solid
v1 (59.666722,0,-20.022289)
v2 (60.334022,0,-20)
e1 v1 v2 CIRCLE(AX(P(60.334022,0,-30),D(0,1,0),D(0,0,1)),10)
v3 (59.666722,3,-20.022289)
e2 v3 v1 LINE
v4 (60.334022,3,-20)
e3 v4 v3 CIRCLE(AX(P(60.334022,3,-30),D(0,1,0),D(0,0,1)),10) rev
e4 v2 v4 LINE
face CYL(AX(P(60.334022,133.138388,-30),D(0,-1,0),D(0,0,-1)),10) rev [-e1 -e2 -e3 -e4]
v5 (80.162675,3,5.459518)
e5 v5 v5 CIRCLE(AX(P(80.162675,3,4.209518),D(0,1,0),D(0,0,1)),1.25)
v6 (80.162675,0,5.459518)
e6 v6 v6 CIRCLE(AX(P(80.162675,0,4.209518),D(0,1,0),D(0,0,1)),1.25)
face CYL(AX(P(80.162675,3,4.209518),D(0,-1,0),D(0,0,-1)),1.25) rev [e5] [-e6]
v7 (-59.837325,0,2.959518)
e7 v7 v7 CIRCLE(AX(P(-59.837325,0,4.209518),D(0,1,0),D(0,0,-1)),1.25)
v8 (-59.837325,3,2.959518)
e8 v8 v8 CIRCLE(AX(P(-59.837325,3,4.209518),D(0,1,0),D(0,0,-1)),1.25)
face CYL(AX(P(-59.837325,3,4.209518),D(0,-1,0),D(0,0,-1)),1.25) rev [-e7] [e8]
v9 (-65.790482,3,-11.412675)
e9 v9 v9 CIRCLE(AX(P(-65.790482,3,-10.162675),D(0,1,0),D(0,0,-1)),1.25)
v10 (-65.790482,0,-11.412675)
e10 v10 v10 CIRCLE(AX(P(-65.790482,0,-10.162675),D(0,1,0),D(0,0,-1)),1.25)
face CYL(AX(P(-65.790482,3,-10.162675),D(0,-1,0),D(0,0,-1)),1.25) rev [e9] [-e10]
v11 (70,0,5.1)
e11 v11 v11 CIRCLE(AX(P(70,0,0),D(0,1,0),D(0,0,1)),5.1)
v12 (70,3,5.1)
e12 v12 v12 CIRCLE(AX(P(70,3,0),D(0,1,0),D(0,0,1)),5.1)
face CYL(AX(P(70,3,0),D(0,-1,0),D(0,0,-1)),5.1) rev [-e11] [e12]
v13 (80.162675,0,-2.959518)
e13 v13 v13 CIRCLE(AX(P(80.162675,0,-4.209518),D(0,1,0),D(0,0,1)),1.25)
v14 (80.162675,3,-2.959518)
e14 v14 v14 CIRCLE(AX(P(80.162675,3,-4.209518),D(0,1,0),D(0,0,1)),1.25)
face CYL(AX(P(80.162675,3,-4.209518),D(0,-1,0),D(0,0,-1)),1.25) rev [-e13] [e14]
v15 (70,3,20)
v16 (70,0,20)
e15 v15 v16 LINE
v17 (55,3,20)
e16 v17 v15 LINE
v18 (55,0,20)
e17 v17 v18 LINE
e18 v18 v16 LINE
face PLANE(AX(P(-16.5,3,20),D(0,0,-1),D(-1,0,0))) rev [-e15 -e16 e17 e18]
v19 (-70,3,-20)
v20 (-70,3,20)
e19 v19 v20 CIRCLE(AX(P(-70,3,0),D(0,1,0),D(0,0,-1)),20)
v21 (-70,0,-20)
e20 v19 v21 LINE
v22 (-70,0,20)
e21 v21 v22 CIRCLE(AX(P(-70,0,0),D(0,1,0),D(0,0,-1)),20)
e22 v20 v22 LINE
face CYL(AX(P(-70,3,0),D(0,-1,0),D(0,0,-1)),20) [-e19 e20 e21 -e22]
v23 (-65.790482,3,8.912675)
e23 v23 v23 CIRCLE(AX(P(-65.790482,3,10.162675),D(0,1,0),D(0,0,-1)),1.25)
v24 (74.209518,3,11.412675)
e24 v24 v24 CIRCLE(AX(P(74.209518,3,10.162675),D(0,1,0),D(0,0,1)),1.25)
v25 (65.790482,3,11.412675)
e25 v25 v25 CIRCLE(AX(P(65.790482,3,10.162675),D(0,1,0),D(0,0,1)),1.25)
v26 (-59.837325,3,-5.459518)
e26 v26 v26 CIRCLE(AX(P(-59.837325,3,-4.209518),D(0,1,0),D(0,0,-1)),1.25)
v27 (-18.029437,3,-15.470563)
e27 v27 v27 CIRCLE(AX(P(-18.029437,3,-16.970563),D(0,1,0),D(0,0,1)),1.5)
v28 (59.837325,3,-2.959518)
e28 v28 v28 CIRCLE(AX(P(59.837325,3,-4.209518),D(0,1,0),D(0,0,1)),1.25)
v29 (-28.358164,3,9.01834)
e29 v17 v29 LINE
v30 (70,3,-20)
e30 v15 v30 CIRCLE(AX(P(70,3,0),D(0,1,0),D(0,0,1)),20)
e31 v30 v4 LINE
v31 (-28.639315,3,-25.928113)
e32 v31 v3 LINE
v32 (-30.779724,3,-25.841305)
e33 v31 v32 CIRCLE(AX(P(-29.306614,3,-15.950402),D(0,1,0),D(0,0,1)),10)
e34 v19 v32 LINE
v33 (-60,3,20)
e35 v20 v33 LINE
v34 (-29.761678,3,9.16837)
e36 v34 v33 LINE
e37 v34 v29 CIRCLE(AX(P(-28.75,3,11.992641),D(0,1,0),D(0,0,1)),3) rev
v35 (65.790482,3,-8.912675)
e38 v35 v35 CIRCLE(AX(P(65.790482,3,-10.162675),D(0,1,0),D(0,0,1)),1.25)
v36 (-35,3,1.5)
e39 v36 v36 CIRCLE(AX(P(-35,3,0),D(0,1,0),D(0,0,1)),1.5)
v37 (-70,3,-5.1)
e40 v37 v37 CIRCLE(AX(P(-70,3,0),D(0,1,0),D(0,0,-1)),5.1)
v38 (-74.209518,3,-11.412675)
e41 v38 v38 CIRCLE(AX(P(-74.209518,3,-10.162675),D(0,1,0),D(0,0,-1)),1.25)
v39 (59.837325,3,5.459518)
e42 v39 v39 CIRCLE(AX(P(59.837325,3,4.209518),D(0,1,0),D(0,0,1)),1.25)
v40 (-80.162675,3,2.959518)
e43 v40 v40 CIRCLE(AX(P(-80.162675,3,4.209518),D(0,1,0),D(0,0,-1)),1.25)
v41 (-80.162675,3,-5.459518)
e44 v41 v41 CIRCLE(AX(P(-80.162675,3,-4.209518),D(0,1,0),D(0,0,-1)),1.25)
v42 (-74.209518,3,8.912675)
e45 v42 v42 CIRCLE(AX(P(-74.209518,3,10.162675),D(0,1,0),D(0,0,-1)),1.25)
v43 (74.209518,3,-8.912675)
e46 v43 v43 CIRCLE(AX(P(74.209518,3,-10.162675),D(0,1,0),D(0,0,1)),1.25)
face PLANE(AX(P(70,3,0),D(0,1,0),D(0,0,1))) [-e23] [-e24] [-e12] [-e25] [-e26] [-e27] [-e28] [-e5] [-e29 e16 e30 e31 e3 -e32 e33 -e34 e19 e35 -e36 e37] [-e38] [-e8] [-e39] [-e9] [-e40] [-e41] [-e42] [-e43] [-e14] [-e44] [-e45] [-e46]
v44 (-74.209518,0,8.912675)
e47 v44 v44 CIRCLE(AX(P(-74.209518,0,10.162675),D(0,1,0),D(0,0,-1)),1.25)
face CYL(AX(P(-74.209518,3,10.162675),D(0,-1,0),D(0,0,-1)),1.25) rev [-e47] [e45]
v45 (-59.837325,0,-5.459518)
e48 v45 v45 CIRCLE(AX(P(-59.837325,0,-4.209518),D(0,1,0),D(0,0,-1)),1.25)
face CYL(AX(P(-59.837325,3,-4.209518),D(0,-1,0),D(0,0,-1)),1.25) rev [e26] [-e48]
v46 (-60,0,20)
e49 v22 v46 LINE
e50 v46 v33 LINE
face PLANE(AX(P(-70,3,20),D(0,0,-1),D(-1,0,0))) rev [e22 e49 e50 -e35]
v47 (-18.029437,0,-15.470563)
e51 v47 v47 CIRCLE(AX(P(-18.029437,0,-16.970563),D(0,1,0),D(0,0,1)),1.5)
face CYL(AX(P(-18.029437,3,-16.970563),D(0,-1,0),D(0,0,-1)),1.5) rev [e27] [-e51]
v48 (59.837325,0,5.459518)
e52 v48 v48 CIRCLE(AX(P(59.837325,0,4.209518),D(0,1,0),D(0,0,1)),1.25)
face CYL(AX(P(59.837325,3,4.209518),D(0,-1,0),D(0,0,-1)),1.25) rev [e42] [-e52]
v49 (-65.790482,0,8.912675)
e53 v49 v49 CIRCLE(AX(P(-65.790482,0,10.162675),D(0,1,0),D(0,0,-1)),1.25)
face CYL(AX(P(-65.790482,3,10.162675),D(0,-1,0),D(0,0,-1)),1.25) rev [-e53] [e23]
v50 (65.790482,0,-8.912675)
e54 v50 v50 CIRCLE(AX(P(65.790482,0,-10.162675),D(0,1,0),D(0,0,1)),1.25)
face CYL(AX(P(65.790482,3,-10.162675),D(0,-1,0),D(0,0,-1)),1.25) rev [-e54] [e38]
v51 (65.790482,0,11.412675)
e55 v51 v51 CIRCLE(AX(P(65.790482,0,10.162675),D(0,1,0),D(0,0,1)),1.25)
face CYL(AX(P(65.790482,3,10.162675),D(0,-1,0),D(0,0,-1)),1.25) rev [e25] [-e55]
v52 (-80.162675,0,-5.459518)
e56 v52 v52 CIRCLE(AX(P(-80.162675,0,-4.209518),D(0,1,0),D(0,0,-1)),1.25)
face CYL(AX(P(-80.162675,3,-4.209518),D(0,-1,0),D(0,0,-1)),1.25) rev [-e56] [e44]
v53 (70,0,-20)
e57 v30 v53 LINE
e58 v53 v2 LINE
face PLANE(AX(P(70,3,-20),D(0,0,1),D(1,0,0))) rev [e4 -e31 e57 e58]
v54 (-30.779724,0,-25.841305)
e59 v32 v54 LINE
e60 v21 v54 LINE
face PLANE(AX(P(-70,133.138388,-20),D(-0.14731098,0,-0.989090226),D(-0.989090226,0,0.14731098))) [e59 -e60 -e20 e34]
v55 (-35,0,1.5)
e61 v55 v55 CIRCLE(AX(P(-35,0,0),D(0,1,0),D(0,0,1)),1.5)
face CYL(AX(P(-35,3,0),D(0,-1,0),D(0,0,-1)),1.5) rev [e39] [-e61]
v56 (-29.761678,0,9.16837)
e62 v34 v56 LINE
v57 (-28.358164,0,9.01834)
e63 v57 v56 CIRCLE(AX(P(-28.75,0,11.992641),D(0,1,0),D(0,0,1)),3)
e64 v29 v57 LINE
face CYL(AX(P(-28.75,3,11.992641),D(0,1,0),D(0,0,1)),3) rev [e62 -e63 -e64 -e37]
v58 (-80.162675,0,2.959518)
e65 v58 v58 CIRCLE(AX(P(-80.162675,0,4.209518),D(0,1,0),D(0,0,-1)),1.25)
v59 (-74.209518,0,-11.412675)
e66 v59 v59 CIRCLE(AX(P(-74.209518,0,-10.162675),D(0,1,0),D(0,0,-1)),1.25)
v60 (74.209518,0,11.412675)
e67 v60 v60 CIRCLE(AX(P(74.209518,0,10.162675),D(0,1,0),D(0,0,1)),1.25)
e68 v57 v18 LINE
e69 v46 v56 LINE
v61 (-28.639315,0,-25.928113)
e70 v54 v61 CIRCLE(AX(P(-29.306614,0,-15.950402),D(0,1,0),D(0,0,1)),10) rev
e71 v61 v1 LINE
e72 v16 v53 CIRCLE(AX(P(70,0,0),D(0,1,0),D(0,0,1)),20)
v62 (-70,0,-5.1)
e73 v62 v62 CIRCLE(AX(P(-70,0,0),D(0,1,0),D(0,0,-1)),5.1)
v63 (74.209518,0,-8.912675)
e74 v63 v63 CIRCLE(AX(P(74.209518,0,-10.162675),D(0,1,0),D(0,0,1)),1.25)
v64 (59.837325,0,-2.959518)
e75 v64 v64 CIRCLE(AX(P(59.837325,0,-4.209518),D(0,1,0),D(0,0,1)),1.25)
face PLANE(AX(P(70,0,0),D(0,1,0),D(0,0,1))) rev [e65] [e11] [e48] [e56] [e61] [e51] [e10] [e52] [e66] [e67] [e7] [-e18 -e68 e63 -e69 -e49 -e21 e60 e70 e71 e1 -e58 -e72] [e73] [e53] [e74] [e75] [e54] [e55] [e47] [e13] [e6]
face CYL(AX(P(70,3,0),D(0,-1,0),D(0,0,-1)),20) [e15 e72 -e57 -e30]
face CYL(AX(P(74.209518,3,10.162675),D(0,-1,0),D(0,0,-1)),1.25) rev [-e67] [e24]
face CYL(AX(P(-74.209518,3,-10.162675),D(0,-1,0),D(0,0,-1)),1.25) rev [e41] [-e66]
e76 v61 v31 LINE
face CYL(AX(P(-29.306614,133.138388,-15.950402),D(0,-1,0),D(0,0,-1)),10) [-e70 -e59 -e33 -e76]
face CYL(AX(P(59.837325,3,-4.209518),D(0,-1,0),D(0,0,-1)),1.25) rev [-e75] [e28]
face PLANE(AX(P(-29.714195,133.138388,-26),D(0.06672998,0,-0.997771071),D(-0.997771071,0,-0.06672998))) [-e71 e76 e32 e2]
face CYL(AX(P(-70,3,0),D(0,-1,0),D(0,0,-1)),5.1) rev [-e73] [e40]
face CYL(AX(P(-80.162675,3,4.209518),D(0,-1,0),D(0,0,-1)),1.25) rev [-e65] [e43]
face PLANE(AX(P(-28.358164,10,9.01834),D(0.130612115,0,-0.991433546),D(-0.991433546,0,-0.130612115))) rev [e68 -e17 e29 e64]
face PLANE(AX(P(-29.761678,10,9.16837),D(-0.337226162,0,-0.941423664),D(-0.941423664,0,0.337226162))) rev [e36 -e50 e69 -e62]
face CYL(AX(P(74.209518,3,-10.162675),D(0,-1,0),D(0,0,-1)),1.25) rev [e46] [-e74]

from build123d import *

# Parameters (mm, degrees)
SKETCH1_R           = 5.1
SKETCH1_R_2         = 1.25
SKETCH1_R_3         = 1.5
BOSS_EXTRUDE1_DEPTH = 3
FILLET1_R           = 3
CUT_EXTRUDE1_DEPTH  = 10
BOSS_EXTRUDE2_DEPTH = 3
CUT_EXTRUDE2_DEPTH  = 10
FILLET2_R           = 10


with BuildPart() as part:
    # Sketch1 → Boss-Extrude1 (new body)
    with BuildSketch(Plane(origin=(0, 0, 0), x_dir=(1, 0, 0), z_dir=(0, 1, 0))):
        with BuildLine():
            Line((70, 20), (-70, 20))
            ThreePointArc((-70, 20), (-90, 0), (-70, -20))
            Line((-70, -20), (-41, -20))
            Line((-41, -20), (-28.75, -7.75))
            Line((-28.75, -7.75), (-16.5, -20))
            Line((-16.5, -20), (70, -20))
            ThreePointArc((70, -20), (90, 0), (70, 20))
        make_face()
        with Locations(Location((70, 0, 0), (0, 0, 270))):
            Circle(SKETCH1_R, mode=Mode.SUBTRACT)
        with Locations(Location((59.837325142, 4.209517756, 0), (0, 0, 270))):
            Circle(SKETCH1_R_2, mode=Mode.SUBTRACT)
        with Locations(Location((65.790482244, 10.162674858, 0), (0, 0, 270))):
            Circle(SKETCH1_R_2, mode=Mode.SUBTRACT)
        with Locations(Location((74.209517756, 10.162674858, 0), (0, 0, 270))):
            Circle(SKETCH1_R_2, mode=Mode.SUBTRACT)
        with Locations(Location((80.162674858, 4.209517756, 0), (0, 0, 270))):
            Circle(SKETCH1_R_2, mode=Mode.SUBTRACT)
        with Locations(Location((80.162674858, -4.209517756, 0), (0, 0, 270))):
            Circle(SKETCH1_R_2, mode=Mode.SUBTRACT)
        with Locations(Location((74.209517756, -10.162674858, 0), (0, 0, 270))):
            Circle(SKETCH1_R_2, mode=Mode.SUBTRACT)
        with Locations(Location((65.790482244, -10.162674858, 0), (0, 0, 270))):
            Circle(SKETCH1_R_2, mode=Mode.SUBTRACT)
        with Locations(Location((59.837325142, -4.209517756, 0), (0, 0, 270))):
            Circle(SKETCH1_R_2, mode=Mode.SUBTRACT)
        with Locations(Location((-59.837325142, -4.209517756, 0), (0, 0, 90))):
            Circle(SKETCH1_R_2, mode=Mode.SUBTRACT)
        with Locations(Location((-65.790482244, -10.162674858, 0), (0, 0, 90))):
            Circle(SKETCH1_R_2, mode=Mode.SUBTRACT)
        with Locations(Location((-74.209517756, -10.162674858, 0), (0, 0, 90))):
            Circle(SKETCH1_R_2, mode=Mode.SUBTRACT)
        with Locations(Location((-80.162674858, -4.209517756, 0), (0, 0, 90))):
            Circle(SKETCH1_R_2, mode=Mode.SUBTRACT)
        with Locations(Location((-80.162674858, 4.209517756, 0), (0, 0, 90))):
            Circle(SKETCH1_R_2, mode=Mode.SUBTRACT)
        with Locations(Location((-74.209517756, 10.162674858, 0), (0, 0, 90))):
            Circle(SKETCH1_R_2, mode=Mode.SUBTRACT)
        with Locations(Location((-65.790482244, 10.162674858, 0), (0, 0, 90))):
            Circle(SKETCH1_R_2, mode=Mode.SUBTRACT)
        with Locations(Location((-59.837325142, 4.209517756, 0), (0, 0, 90))):
            Circle(SKETCH1_R_2, mode=Mode.SUBTRACT)
        with Locations(Location((-70, 0, 0), (0, 0, 90))):
            Circle(SKETCH1_R, mode=Mode.SUBTRACT)
        with Locations(Location((-35, 0, 0), (0, 0, 270))):
            Circle(SKETCH1_R_3, mode=Mode.SUBTRACT)
        with Locations(Location((-18.029437252, 16.970562748, 0), (0, 0, 270))):
            Circle(SKETCH1_R_3, mode=Mode.SUBTRACT)
    extrude(amount=BOSS_EXTRUDE1_DEPTH)

    # Fillet1
    fillet1_edges = [part.edges().sort_by_distance(p)[0] for p in [
        (-16.5, 1.5, 20),
        (-28.75, 1.5, 7.75),
        (-41, 1.5, 20),
    ]]
    fillet(fillet1_edges, radius=FILLET1_R)

    # Sketch2 → Cut-Extrude1 (cut)
    with BuildSketch(Plane.XZ):
        Polygon((-28.358163655, 9.01834005), (55, 20), (-28.358163655, 26.558419641), align=None)
    extrude(amount=-CUT_EXTRUDE1_DEPTH, mode=Mode.SUBTRACT)

    # Sketch3 → Boss-Extrude2 (add)
    with BuildSketch(Plane.XZ):
        Polygon((-70, -20), (-29.714195297, -26), (60, -20), align=None)
    extrude(amount=-BOSS_EXTRUDE2_DEPTH)

    # Sketch4 → Cut-Extrude2 (cut)
    with BuildSketch(Plane.XZ):
        Polygon((-29.761678485, 9.168369694), (-60, 20), (-60.52961588, 25.578691215), (-29.998372271, 24.401767037), align=None)
    extrude(amount=-CUT_EXTRUDE2_DEPTH, mode=Mode.SUBTRACT)

    # Fillet2
    # the kernel refuses this fillet: 10 mm, written as the material it adds along each edge
    with BuildSketch(Plane(origin=(60, 0, -20), x_dir=(-0.9977710708464071, 0, -0.06672997963445026), z_dir=(0, 1, 0))) as fillet2_piece_1:
        with BuildLine():
            CenterArc((FILLET2_R * 0.0334022154031, -FILLET2_R), FILLET2_R, 90, 3.826189391)
            Line((-FILLET2_R * 0.0333277642314, -FILLET2_R * 0.00222892915359), (0, 0))
            Line((0, 0), (FILLET2_R * 0.0334022154031, 0))
        make_face()
    extrude(amount=3)
    # the kernel refuses this fillet: 10 mm, written as the material it takes off along each edge
    with BuildSketch(Plane(origin=(-29.714195297, -2.693204599, -26), x_dir=(-0.9890902260552777, 0, 0.14731097963804135), z_dir=(0, 1, 0))) as fillet2_2_piece_1:
        with BuildLine():
            CenterArc((FILLET2_R * 0.107728183948, FILLET2_R), FILLET2_R, 257.702684713, 12.297315287)
            Line((-FILLET2_R * 0.105256420594, FILLET2_R * 0.0229444446563), (0, 0))
            Line((0, 0), (FILLET2_R * 0.107728183948, 0))
        make_face()
    extrude(amount=8.386409197, mode=Mode.SUBTRACT)


solid = part.part
